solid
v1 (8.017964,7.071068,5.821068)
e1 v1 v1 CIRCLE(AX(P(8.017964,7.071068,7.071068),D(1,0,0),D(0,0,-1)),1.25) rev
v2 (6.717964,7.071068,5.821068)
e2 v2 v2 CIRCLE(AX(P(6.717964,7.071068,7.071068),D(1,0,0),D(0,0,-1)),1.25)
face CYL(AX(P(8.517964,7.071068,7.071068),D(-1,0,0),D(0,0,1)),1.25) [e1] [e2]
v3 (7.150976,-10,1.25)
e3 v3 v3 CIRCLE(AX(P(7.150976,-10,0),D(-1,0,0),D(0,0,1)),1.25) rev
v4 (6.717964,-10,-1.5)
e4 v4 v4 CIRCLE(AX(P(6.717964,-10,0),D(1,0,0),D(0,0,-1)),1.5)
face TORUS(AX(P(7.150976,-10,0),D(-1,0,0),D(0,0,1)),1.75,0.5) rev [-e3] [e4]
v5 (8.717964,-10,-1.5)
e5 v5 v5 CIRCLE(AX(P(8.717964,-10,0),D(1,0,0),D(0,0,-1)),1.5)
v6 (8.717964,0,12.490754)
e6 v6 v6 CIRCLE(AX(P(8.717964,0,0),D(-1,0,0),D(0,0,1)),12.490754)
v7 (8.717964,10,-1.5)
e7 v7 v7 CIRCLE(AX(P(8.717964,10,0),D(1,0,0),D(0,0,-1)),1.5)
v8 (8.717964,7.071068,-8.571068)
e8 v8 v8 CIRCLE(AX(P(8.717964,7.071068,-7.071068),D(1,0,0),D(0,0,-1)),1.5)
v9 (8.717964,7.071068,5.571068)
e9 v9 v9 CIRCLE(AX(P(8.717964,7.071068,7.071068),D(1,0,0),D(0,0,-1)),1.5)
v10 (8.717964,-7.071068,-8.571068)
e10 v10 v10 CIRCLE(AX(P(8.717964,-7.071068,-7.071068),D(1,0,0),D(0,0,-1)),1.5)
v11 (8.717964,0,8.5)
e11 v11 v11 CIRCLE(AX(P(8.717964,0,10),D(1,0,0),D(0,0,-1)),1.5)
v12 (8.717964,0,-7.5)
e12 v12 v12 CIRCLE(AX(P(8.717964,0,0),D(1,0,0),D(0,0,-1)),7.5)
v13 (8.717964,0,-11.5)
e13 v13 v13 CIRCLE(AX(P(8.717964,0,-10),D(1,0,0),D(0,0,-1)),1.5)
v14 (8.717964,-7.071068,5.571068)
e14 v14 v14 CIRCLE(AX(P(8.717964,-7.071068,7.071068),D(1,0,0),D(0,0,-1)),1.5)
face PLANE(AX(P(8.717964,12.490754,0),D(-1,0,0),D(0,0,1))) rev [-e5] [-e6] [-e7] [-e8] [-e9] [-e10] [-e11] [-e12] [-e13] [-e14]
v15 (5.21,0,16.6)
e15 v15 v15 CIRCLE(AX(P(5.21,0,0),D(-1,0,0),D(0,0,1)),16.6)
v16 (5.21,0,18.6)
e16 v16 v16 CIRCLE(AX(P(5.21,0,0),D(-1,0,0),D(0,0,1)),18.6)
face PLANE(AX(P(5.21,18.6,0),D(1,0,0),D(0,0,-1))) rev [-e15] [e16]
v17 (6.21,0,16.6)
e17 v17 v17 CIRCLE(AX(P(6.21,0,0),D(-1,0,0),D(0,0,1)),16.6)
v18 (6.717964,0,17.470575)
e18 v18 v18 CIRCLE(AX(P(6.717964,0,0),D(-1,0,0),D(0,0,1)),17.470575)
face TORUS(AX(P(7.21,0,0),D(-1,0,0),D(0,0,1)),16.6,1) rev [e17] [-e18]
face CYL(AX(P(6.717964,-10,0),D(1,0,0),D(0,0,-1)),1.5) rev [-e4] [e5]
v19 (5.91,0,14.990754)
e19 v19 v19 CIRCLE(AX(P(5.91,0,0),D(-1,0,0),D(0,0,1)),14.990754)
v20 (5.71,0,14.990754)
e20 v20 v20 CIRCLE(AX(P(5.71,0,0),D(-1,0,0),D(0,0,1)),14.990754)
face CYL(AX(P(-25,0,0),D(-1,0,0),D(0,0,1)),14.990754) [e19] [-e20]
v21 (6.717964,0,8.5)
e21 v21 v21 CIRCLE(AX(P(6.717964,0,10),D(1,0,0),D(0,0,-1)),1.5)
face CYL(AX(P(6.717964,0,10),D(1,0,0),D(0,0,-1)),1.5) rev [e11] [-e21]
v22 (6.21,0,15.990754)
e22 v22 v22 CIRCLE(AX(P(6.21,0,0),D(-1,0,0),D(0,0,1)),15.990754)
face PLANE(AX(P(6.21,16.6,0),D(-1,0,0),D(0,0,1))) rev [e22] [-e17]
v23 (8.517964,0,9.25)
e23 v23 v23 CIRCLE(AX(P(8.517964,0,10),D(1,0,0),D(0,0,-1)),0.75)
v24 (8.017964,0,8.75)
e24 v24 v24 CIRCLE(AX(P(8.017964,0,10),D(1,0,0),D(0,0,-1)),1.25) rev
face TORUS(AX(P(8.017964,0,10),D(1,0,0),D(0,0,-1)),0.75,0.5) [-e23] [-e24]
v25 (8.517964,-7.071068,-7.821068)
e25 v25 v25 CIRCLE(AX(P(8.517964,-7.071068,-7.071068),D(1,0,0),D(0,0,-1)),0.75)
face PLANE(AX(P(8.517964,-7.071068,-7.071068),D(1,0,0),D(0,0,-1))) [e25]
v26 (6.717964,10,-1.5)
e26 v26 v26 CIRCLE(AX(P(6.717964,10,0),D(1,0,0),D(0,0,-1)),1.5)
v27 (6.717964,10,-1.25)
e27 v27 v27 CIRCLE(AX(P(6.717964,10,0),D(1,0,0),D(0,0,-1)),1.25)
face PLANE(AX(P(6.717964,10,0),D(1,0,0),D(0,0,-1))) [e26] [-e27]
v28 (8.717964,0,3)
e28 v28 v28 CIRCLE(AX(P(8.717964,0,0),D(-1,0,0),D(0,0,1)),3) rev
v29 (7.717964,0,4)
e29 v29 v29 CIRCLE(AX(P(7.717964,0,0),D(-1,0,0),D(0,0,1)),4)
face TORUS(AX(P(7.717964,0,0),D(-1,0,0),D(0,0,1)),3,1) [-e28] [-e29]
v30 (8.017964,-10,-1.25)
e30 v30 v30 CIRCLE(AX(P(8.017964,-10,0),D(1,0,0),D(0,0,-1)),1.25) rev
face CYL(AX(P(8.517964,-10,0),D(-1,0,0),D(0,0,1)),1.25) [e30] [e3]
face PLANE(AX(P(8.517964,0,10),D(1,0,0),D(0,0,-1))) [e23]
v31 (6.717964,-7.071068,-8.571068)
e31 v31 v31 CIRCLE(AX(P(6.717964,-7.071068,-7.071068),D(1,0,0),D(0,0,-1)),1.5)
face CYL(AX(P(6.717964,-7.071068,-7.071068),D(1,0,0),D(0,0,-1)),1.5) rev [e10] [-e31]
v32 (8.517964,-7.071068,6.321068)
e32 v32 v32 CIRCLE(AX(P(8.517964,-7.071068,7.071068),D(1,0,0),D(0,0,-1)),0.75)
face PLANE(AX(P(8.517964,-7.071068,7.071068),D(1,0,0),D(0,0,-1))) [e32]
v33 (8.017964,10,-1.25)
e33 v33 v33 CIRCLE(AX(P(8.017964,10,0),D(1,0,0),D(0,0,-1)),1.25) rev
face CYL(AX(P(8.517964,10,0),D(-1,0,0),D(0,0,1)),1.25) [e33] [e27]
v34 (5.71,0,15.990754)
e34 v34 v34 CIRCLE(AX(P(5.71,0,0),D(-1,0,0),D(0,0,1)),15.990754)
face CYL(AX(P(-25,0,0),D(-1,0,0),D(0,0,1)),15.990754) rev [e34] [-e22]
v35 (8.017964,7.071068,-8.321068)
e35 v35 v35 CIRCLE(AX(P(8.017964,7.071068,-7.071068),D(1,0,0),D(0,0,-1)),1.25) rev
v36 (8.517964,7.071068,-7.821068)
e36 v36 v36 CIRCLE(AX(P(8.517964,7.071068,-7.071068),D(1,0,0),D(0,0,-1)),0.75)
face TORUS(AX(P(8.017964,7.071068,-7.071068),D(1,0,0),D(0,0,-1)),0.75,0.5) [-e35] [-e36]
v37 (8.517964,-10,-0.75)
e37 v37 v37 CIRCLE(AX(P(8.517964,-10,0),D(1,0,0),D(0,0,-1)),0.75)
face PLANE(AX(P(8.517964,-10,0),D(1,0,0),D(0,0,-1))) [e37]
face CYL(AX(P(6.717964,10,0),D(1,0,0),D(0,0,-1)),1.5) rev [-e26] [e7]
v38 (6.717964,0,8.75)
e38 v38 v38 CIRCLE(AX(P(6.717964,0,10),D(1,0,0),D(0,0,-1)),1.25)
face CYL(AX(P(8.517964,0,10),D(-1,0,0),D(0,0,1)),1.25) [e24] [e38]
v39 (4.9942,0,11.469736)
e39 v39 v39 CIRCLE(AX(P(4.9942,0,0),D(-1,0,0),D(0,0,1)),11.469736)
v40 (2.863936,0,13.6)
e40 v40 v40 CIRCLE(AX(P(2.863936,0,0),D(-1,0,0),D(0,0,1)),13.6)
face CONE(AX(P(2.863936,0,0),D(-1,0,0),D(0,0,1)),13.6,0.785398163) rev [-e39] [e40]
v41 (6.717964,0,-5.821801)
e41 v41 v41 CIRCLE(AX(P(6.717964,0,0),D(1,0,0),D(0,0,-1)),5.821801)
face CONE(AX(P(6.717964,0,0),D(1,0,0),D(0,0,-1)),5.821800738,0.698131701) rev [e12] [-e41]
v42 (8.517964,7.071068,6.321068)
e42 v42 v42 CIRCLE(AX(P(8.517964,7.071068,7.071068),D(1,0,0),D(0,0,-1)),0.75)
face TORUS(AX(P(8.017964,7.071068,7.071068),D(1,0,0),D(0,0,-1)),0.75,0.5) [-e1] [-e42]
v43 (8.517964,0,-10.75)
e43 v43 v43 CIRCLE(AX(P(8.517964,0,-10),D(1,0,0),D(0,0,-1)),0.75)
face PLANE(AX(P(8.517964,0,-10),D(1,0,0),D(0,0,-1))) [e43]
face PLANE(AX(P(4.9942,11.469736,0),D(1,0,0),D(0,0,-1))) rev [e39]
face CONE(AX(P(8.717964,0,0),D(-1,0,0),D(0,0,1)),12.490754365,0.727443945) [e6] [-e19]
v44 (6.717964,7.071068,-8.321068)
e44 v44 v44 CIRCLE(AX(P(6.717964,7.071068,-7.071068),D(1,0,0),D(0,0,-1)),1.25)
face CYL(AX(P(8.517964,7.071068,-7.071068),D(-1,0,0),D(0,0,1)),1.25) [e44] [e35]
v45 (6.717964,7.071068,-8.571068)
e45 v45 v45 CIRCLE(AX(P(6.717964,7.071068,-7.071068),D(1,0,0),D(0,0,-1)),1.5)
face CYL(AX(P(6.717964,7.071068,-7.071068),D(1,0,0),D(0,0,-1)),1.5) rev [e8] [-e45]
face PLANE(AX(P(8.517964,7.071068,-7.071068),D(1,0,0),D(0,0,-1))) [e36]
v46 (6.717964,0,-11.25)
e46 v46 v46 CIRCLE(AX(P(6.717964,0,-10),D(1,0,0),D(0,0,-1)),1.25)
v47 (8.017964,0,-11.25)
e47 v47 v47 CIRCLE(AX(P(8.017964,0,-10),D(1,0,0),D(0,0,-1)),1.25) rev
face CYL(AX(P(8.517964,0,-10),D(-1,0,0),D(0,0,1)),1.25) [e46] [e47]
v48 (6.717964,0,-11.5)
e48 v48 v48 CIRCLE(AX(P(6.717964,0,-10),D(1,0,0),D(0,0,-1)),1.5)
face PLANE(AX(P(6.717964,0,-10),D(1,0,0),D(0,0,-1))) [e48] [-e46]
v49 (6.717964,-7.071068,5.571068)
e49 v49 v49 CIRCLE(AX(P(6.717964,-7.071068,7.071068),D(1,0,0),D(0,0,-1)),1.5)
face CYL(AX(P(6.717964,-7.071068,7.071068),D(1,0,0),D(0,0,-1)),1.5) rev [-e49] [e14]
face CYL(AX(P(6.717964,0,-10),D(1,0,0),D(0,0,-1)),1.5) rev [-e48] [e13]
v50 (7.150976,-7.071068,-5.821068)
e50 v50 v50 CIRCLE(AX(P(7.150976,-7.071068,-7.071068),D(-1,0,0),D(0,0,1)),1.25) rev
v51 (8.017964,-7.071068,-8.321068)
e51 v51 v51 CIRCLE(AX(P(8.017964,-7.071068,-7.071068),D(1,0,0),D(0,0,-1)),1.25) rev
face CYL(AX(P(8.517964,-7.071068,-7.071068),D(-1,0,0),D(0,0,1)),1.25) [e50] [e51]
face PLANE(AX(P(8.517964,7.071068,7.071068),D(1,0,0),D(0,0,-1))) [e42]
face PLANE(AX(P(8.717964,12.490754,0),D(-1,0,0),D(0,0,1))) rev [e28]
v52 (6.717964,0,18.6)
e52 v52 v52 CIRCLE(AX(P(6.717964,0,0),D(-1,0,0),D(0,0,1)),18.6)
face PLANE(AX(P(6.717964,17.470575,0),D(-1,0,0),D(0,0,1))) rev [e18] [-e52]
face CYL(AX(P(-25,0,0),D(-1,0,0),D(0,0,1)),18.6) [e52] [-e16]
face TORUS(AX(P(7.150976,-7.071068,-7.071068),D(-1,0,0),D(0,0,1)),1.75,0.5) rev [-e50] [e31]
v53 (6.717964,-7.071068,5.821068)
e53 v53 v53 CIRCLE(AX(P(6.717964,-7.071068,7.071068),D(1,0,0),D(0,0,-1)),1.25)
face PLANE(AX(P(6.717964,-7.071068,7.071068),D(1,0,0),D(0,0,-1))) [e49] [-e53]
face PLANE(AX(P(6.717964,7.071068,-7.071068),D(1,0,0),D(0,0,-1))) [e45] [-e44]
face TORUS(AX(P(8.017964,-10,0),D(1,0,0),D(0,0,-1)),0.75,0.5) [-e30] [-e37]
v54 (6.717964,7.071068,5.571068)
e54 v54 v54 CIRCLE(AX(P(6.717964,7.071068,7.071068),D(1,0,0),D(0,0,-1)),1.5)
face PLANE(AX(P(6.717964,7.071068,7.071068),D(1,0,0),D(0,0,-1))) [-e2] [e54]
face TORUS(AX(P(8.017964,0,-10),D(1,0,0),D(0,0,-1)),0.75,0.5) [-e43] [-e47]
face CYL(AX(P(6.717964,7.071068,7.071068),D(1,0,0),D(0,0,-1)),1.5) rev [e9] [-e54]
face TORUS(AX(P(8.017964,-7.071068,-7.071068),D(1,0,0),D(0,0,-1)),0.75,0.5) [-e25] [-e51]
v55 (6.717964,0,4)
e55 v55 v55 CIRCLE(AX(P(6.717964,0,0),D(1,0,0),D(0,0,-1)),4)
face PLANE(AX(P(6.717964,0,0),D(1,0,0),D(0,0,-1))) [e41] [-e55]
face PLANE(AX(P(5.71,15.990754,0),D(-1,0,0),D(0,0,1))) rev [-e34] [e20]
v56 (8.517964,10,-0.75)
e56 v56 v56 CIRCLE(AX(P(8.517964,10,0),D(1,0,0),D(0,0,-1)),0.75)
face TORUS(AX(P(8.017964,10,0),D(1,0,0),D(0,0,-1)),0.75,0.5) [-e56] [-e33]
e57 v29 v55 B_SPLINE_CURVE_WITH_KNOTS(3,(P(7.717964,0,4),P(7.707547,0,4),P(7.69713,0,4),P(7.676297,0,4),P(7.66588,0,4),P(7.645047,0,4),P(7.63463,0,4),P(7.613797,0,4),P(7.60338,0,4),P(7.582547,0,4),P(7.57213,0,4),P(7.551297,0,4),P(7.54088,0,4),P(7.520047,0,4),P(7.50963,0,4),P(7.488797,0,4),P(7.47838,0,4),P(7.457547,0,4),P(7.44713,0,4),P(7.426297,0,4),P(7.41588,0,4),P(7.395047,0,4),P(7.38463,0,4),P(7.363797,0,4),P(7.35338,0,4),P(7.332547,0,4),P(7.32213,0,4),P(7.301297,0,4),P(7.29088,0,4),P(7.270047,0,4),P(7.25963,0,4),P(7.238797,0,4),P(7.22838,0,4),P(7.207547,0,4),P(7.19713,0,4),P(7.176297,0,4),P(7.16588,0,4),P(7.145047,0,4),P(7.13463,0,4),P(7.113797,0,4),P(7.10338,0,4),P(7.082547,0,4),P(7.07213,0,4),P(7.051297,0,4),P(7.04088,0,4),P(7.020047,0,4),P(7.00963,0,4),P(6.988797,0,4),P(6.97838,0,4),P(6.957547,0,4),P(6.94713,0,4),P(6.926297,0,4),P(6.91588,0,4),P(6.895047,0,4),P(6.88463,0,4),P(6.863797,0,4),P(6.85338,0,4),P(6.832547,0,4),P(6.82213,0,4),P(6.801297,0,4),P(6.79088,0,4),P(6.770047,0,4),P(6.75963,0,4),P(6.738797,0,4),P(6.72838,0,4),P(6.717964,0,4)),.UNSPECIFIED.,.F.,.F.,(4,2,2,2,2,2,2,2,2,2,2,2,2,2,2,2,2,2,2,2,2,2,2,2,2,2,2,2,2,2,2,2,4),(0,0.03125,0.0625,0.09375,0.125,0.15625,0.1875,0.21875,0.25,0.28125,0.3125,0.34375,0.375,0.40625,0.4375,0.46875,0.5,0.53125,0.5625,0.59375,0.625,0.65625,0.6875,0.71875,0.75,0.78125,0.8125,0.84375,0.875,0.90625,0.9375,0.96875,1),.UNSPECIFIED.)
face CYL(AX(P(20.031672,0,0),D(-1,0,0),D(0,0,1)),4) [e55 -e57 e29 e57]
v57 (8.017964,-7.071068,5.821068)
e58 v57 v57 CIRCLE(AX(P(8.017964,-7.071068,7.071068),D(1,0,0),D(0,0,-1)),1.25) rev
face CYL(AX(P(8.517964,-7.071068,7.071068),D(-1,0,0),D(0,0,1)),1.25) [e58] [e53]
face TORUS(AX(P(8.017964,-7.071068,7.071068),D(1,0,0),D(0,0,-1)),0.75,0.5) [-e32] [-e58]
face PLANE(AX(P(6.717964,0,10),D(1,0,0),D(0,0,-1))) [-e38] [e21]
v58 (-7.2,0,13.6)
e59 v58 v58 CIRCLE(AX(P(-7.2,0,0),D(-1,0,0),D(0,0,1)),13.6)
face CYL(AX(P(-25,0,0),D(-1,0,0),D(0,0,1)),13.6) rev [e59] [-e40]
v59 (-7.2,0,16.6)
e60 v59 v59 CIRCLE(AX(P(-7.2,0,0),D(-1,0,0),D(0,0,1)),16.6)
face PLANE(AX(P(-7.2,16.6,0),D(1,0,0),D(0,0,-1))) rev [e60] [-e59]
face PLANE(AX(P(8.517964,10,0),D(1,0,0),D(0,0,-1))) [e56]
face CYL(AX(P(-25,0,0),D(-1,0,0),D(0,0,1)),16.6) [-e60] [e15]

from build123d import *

# Parameters (mm, degrees)
SKETCH2_R           = 7.5
SKETCH2_R_2         = 1.4999999999999998
SKETCH2_R_3         = 1.5000000000000486
SKETCH2_R_4         = 1.5000000000000004
SKETCH2_R_5         = 1.5000000000000007
SKETCH2_R_6         = 1.4999999999999996
CUT_EXTRUDE1_DEPTH  = 2
SKETCH3_R           = 1.2499999999999998
SKETCH3_R_2         = 1.2500000000000484
SKETCH3_R_3         = 1.2500000000003157
SKETCH3_R_4         = 1.2500000000006564
SKETCH3_R_5         = 1.2500000000008784
SKETCH3_R_6         = 1.2500000000008638
SKETCH3_R_7         = 1.2500000000006306
SKETCH3_R_8         = 1.2500000000003249
BOSS_EXTRUDE1_DEPTH = 1.8
FILLET2_R           = 0.5
CHAMFER1_SIZE2      = 1.678199262
CHAMFER1_SIZE       = 2
SKETCH4_R           = 4
BOSS_EXTRUDE2_DEPTH = 2
FILLET3_R           = 1


# Some blends are built 0.0001 mm under size
with BuildPart() as part:
    # Sketch1 → Revolve1 (revolve)
    with BuildSketch(Plane.XY, mode=Mode.PRIVATE) as revolve1_sk:
        with BuildLine():
            Line((6.7179637508004015, 18.599999999999998), (5.21, 18.599999999999998))
            Line((5.21, 18.599999999999998), (5.209999999999999, 16.599999999999998))
            Line((5.209999999999999, 16.599999999999998), (-7.200000000000002, 16.6))
            Line((-7.200000000000002, 16.6), (-7.200000000000002, 13.600000000000001))
            Line((-7.200000000000002, 13.600000000000001), (2.8639359389992203, 13.600000000000001))
            Line((2.8639359389992203, 13.600000000000001), (4.994200100271213, 11.46973583872801))
            Line((4.994200100271213, 11.46973583872801), (4.9942001002712395, 0))
            Line((4.9942001002712395, 0), (8.717963750800402, 0))
            Line((8.717963750800402, 0), (8.717963750800404, 12.490754364542397))
            Line((8.717963750800404, 12.490754364542397), (5.909999999999997, 14.990754364542399))
            Line((5.909999999999997, 14.990754364542399), (5.709999999999997, 14.990754364542399))
            Line((5.709999999999997, 14.990754364542399), (5.709999999999996, 15.990754364542399))
            Line((5.709999999999996, 15.990754364542399), (6.209999999999996, 15.990754364542399))
            Line((6.209999999999996, 15.990754364542399), (6.209999999999996, 16.59999999999999))
            ThreePointArc((6.209999999999996, 16.59999999999999), (6.34627659253682, 17.103966145093295), (6.717963750800402, 17.47057471217213))
            Line((6.717963750800402, 17.47057471217213), (6.7179637508004015, 18.599999999999998))
        make_face()
    revolve(revolve1_sk.sketch.rotate(Axis((-25, 0, 0), (1, 0, 0)), 90), axis=Axis((-25, 0, 0), (1, 0, 0)))

    # Sketch2 → Cut-Extrude1 (cut)
    with BuildSketch(Plane(origin=(8.717963750800402, 0, 0), x_dir=(0, 0, -1), z_dir=(1, 0, 0))):
        Circle(SKETCH2_R)
        with Locations((0, 10)):
            Circle(SKETCH2_R_2)
        with Locations((7.071067811865598, 7.071067811865774)):
            Circle(SKETCH2_R_3)
        with Locations((10.000000000000421, 4.2247e-13)):
            Circle(SKETCH2_R_4)
        with Locations((7.071067811866196, -7.071067811865177)):
            Circle(SKETCH2_R_5)
        with Locations((8.4495e-13, -10)):
            Circle(SKETCH2_R_2)
        with Locations((-7.071067811864754, -7.071067811865775)):
            Circle(SKETCH2_R_6)
        with Locations((-9.999999999999579, -4.237e-13)):
            Circle(SKETCH2_R_4)
        with Locations((-7.071067811865353, 7.071067811865176)):
            Circle(SKETCH2_R_6)
    extrude(amount=-CUT_EXTRUDE1_DEPTH, mode=Mode.SUBTRACT)

    # Sketch3 → Boss-Extrude1 (add)
    with BuildSketch(Plane(origin=(6.717963750800403, 0, 0), x_dir=(0, 0, -1), z_dir=(1, 0, 0))):
        with Locations((0, 10)):
            Circle(SKETCH3_R)
        with Locations((7.071067811865598, 7.071067811865777)):
            Circle(SKETCH3_R_2)
        with Locations((10.000000000000423, 4.2449e-13)):
            Circle(SKETCH3_R_3)
        with Locations((7.071067811866199, -7.071067811865174)):
            Circle(SKETCH3_R_4)
        with Locations((8.4898e-13, -10)):
            Circle(SKETCH3_R_5)
        with Locations((-7.071067811864751, -7.0710678118657775)):
            Circle(SKETCH3_R_6)
        with Locations((-9.999999999999577, -4.2571e-13)):
            Circle(SKETCH3_R_7)
        with Locations((-7.071067811865353, 7.0710678118651735)):
            Circle(SKETCH3_R_8)
    extrude(amount=BOSS_EXTRUDE1_DEPTH)

    # Fillet2
    # the kernel refuses this fillet: 0.5 mm, written as the material it adds along each edge
    with BuildSketch(Plane(origin=(6.717963750800403, -7.071067811865174, -7.071067811866199), x_dir=(0, 0, -1), z_dir=(0, -1, 0))) as fillet2_piece_1:
        with BuildLine():
            CenterArc((1.7500000000006564, 0.43301270189186614), FILLET2_R, 180, 59.99999999991513)
            Line((1.2500000000006564, 0.43301270189186614), (1.2500000000006564, 0))
            Line((1.2500000000006564, 0), (1.500000000000015, 1.688e-14))
        make_face()
    revolve(axis=Axis((6.717963750800403, -7.071067811865174, -7.071067811866199), (1, 0, 0)))
    with BuildSketch(Plane(origin=(6.717963750800403, -10, -8.4898e-13), x_dir=(0, 0, -1), z_dir=(0, -1, 0))) as fillet2_piece_2:
        with BuildLine():
            CenterArc((1.7500000000008784, 0.43301270189173824), FILLET2_R, 180, 59.99999999988563)
            Line((1.2500000000008784, 0.43301270189173824), (1.2500000000008784, 0))
            Line((1.2500000000008784, 0), (1.5000000000000144, 1.776e-14))
        make_face()
    revolve(axis=Axis((6.717963750800403, -10, -8.4898e-13), (1, 0, 0)))
    # the kernel refuses this fillet: 0.5 mm, written as the material it takes off along each edge
    with BuildSketch(Plane(origin=(8.517963750800403, 10, 0), x_dir=(0, 0, -1), z_dir=(0, -1, 0))) as fillet2_2_piece_1:
        with BuildLine():
            CenterArc((1.2499999999999998 - FILLET2_R, -FILLET2_R), FILLET2_R, 0, 90)
            Line((1.2499999999999998 - FILLET2_R, 0), (1.2499999999999998, 0))
            Line((1.2499999999999998, 0), (1.2499999999999998, -FILLET2_R))
        make_face()
    revolve(axis=Axis((8.517963750800403, 10, 0), (1, 0, 0)), mode=Mode.SUBTRACT)
    with BuildSketch(Plane(origin=(8.517963750800403, 7.071067811865777, -7.071067811865598), x_dir=(0, 0, -1), z_dir=(0, -1, 0))) as fillet2_2_piece_2:
        with BuildLine():
            CenterArc((1.250000000000048 - FILLET2_R, -FILLET2_R), FILLET2_R, 0, 90)
            Line((1.250000000000048 - FILLET2_R, 0), (1.250000000000048, 0))
            Line((1.250000000000048, 0), (1.250000000000048, -FILLET2_R))
        make_face()
    revolve(axis=Axis((8.517963750800403, 7.071067811865777, -7.071067811865598), (1, 0, 0)), mode=Mode.SUBTRACT)
    with BuildSketch(Plane(origin=(8.517963750800403, 4.2449e-13, -10.000000000000423), x_dir=(0, 0, -1), z_dir=(0, -1, 0))) as fillet2_2_piece_3:
        with BuildLine():
            CenterArc((1.2500000000003162 - FILLET2_R, -FILLET2_R), FILLET2_R, 0, 90)
            Line((1.2500000000003162 - FILLET2_R, 0), (1.2500000000003162, 0))
            Line((1.2500000000003162, 0), (1.2500000000003162, -FILLET2_R))
        make_face()
    revolve(axis=Axis((8.517963750800403, 4.2449e-13, -10.000000000000423), (1, 0, 0)), mode=Mode.SUBTRACT)
    with BuildSketch(Plane(origin=(8.517963750800403, -7.071067811865174, -7.071067811866199), x_dir=(0, 0, -1), z_dir=(0, -1, 0))) as fillet2_2_piece_4:
        with BuildLine():
            CenterArc((1.2500000000006564 - FILLET2_R, -FILLET2_R), FILLET2_R, 0, 90)
            Line((1.2500000000006564 - FILLET2_R, 0), (1.2500000000006564, 0))
            Line((1.2500000000006564, 0), (1.2500000000006564, -FILLET2_R))
        make_face()
    revolve(axis=Axis((8.517963750800403, -7.071067811865174, -7.071067811866199), (1, 0, 0)), mode=Mode.SUBTRACT)
    with BuildSketch(Plane(origin=(8.517963750800403, -10, -8.4898e-13), x_dir=(0, 0, -1), z_dir=(0, -1, 0))) as fillet2_2_piece_5:
        with BuildLine():
            CenterArc((1.2500000000008784 - FILLET2_R, -FILLET2_R), FILLET2_R, 0, 90)
            Line((1.2500000000008784 - FILLET2_R, 0), (1.2500000000008784, 0))
            Line((1.2500000000008784, 0), (1.2500000000008784, -FILLET2_R))
        make_face()
    revolve(axis=Axis((8.517963750800403, -10, -8.4898e-13), (1, 0, 0)), mode=Mode.SUBTRACT)
    with BuildSketch(Plane(origin=(8.517963750800403, -7.0710678118657775, 7.071067811864751), x_dir=(0, 0, -1), z_dir=(0, -1, 0))) as fillet2_2_piece_6:
        with BuildLine():
            CenterArc((1.2500000000008633 - FILLET2_R, -FILLET2_R), FILLET2_R, 0, 90)
            Line((1.2500000000008633 - FILLET2_R, 0), (1.2500000000008633, 0))
            Line((1.2500000000008633, 0), (1.2500000000008633, -FILLET2_R))
        make_face()
    revolve(axis=Axis((8.517963750800403, -7.0710678118657775, 7.071067811864751), (1, 0, 0)), mode=Mode.SUBTRACT)
    with BuildSketch(Plane(origin=(8.517963750800403, -4.2571e-13, 9.999999999999577), x_dir=(0, 0, -1), z_dir=(0, -1, 0))) as fillet2_2_piece_7:
        with BuildLine():
            CenterArc((1.2500000000006306 - FILLET2_R, -FILLET2_R), FILLET2_R, 0, 90)
            Line((1.2500000000006306 - FILLET2_R, 0), (1.2500000000006306, 0))
            Line((1.2500000000006306, 0), (1.2500000000006306, -FILLET2_R))
        make_face()
    revolve(axis=Axis((8.517963750800403, -4.2571e-13, 9.999999999999577), (1, 0, 0)), mode=Mode.SUBTRACT)
    with BuildSketch(Plane(origin=(8.517963750800403, 7.0710678118651735, 7.071067811865353), x_dir=(0, 0, -1), z_dir=(0, -1, 0))) as fillet2_2_piece_8:
        with BuildLine():
            CenterArc((1.250000000000325 - FILLET2_R, -FILLET2_R), FILLET2_R, 0, 90)
            Line((1.250000000000325 - FILLET2_R, 0), (1.250000000000325, 0))
            Line((1.250000000000325, 0), (1.250000000000325, -FILLET2_R))
        make_face()
    revolve(axis=Axis((8.517963750800403, 7.0710678118651735, 7.071067811865353), (1, 0, 0)), mode=Mode.SUBTRACT)

    # Chamfer1
    chamfer1_edges = [part.edges().sort_by_distance(p)[0] for p in [
        (6.717963750800402, 9.2e-16, 7.5),
    ]]
    chamfer1_side = [part.faces().sort_by_distance(p)[0] for p in [
        (6.7515277360474935, 9.2e-16, 7.5),
    ]]
    chamfer(chamfer1_edges, length=CHAMFER1_SIZE - 0.0001, length2=CHAMFER1_SIZE2 - 0.0001, reference=chamfer1_side[0])  # a hair under: the kernel refuses the full size

    # Sketch4 → Boss-Extrude2 (add)
    with BuildSketch(Plane(origin=(6.717963750800403, 0, 0), x_dir=(0, 0, -1), z_dir=(1, 0, 0))):
        with Locations(Location((0, 0, 0), (0, 0, 180))):
            Circle(SKETCH4_R)
    extrude(amount=BOSS_EXTRUDE2_DEPTH)

    # Fillet3
    fillet3_edges = [part.edges().sort_by_distance(p)[0] for p in [
        (8.717963750800404, -9.8e-16, -4),
    ]]
    fillet(fillet3_edges, radius=FILLET3_R)


solid = part.part
